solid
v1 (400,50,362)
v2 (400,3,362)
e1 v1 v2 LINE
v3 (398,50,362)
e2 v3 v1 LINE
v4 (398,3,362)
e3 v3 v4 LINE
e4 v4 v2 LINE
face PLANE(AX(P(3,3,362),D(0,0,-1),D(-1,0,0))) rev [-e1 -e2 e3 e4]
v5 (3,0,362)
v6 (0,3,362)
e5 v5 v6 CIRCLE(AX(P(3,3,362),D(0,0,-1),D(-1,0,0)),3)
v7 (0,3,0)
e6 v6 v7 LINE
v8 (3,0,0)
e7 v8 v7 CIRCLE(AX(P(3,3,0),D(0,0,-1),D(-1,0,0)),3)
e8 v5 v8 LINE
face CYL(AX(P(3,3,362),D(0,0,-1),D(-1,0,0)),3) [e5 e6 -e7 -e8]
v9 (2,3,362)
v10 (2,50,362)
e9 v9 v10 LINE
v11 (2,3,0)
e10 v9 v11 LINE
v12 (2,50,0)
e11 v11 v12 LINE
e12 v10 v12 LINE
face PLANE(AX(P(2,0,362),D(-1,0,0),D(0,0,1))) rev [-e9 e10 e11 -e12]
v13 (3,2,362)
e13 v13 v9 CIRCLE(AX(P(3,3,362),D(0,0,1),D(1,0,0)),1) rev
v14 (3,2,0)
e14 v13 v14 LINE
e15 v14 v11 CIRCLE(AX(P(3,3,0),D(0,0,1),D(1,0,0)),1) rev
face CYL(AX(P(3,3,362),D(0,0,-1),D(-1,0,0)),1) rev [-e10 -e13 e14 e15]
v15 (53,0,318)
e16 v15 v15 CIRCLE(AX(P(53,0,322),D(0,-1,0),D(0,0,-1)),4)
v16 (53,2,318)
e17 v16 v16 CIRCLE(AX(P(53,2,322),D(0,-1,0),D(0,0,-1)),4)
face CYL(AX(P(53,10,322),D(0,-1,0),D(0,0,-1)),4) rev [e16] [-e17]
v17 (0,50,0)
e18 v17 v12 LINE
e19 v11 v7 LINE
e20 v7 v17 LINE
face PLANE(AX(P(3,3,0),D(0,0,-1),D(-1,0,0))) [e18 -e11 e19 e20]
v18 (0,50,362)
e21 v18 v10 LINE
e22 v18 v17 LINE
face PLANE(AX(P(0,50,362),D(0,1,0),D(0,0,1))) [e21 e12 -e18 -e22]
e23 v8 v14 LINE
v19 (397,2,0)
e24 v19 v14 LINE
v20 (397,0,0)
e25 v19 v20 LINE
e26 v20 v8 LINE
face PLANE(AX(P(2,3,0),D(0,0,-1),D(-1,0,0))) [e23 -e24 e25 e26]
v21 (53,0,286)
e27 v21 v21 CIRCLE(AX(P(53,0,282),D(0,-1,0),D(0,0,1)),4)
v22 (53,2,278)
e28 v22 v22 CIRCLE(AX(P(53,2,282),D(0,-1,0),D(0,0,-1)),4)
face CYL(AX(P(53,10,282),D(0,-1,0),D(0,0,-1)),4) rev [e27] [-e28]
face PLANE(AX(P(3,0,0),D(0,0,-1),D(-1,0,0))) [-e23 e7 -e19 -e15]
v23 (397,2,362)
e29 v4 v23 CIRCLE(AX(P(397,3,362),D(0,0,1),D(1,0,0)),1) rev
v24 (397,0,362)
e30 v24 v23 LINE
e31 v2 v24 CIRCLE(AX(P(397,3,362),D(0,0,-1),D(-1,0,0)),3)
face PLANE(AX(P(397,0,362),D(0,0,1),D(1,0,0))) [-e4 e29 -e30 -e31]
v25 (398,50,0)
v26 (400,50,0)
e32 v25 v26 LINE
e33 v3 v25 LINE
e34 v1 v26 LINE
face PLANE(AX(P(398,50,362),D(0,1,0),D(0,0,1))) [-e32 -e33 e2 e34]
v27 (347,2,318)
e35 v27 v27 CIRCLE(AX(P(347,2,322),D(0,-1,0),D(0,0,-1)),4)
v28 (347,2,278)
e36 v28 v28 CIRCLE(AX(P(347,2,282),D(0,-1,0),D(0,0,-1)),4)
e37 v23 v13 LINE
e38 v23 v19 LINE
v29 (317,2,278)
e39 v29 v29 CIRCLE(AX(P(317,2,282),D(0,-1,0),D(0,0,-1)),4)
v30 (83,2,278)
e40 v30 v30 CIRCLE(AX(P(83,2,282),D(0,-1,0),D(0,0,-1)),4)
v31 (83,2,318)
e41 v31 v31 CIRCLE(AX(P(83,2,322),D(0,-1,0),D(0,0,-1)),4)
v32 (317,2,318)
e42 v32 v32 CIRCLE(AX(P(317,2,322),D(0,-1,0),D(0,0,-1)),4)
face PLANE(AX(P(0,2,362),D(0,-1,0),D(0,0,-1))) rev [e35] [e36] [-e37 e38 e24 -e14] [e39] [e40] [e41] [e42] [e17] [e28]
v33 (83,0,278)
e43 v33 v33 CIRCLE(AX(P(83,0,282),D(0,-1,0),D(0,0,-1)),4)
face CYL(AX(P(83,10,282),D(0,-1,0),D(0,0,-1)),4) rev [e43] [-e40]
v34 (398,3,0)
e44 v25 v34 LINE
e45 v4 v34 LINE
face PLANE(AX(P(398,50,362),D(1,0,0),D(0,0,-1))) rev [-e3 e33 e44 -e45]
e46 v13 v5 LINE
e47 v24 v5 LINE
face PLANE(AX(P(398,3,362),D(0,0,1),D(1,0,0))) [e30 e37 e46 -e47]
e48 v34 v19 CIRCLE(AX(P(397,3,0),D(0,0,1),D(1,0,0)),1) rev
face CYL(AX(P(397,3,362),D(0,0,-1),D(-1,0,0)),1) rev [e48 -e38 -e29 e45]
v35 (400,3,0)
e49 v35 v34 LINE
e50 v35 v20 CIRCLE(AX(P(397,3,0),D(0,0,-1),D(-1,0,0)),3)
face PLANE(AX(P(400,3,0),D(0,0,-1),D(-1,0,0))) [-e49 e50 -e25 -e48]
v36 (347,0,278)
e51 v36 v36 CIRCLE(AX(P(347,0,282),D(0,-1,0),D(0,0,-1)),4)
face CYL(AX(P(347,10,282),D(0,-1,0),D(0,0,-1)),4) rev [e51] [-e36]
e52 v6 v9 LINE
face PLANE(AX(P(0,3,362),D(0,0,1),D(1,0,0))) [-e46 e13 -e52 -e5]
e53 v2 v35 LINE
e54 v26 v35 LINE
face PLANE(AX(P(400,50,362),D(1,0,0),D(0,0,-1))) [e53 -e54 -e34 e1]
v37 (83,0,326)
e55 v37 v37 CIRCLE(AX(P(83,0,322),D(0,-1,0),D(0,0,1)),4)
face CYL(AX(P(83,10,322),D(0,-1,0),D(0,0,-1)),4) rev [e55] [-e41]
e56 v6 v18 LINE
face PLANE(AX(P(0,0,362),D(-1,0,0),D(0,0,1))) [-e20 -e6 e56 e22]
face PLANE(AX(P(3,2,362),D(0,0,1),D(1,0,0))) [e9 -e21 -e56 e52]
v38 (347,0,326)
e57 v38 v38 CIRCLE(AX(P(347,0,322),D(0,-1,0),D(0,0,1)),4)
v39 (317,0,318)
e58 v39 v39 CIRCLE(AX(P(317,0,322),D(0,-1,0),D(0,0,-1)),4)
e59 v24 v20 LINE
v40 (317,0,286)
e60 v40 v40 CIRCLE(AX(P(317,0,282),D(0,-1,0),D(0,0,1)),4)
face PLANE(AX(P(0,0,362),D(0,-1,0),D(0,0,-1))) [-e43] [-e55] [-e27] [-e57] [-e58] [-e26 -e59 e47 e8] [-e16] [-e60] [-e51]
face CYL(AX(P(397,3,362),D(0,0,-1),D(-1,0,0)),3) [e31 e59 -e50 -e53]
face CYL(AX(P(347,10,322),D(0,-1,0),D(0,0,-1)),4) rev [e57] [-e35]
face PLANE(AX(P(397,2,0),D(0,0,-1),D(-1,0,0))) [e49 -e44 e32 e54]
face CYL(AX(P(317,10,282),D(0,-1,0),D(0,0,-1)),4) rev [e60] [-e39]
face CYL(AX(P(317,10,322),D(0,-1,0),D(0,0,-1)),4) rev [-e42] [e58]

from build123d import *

# Parameters (mm, degrees)
BASE_FLANGE1_DEPTH = 362
SKETCH6_R          = 4
CUT_EXTRUDE1_DEPTH = 10


# Sheet-metal steps are written as plain solids
with BuildPart() as part:
    # Sketch1 → Base-Flange1 (new body)
    with BuildSketch(Plane.XY):
        with BuildLine():
            Line((0, 50), (0, 3))
            ThreePointArc((0, 3), (0.878679656, 0.878679656), (3, 0))
            Line((3, 0), (397, 0))
            ThreePointArc((397, 0), (399.121320344, 0.878679656), (400, 3))
            Line((400, 3), (400, 50))
            Line((400, 50), (398, 50))
            Line((398, 50), (398, 3))
            ThreePointArc((398, 3), (397.707106781, 2.292893219), (397, 2))
            Line((397, 2), (3, 2))
            ThreePointArc((3, 2), (2.292893219, 2.292893219), (2, 3))
            Line((2, 3), (2, 50))
            Line((2, 50), (0, 50))
        make_face()
    extrude(amount=BASE_FLANGE1_DEPTH)

    # Sketch6 → Cut-Extrude1 (cut)
    with BuildSketch(Plane.XZ):
        with Locations(Location((53, 322, 0), (0, 0, 270))):
            Circle(SKETCH6_R)
        with Locations(Location((83, 322, 0), (0, 0, 270))):
            Circle(SKETCH6_R)
        with Locations(Location((83, 282, 0), (0, 0, 270))):
            Circle(SKETCH6_R)
        with Locations(Location((53, 282, 0), (0, 0, 270))):
            Circle(SKETCH6_R)
        with Locations(Location((347, 282, 0), (0, 0, 270))):
            Circle(SKETCH6_R)
        with Locations(Location((317, 282, 0), (0, 0, 270))):
            Circle(SKETCH6_R)
        with Locations(Location((317, 322, 0), (0, 0, 270))):
            Circle(SKETCH6_R)
        with Locations(Location((347, 322, 0), (0, 0, 270))):
            Circle(SKETCH6_R)
    extrude(amount=-CUT_EXTRUDE1_DEPTH, mode=Mode.SUBTRACT)


solid = part.part
